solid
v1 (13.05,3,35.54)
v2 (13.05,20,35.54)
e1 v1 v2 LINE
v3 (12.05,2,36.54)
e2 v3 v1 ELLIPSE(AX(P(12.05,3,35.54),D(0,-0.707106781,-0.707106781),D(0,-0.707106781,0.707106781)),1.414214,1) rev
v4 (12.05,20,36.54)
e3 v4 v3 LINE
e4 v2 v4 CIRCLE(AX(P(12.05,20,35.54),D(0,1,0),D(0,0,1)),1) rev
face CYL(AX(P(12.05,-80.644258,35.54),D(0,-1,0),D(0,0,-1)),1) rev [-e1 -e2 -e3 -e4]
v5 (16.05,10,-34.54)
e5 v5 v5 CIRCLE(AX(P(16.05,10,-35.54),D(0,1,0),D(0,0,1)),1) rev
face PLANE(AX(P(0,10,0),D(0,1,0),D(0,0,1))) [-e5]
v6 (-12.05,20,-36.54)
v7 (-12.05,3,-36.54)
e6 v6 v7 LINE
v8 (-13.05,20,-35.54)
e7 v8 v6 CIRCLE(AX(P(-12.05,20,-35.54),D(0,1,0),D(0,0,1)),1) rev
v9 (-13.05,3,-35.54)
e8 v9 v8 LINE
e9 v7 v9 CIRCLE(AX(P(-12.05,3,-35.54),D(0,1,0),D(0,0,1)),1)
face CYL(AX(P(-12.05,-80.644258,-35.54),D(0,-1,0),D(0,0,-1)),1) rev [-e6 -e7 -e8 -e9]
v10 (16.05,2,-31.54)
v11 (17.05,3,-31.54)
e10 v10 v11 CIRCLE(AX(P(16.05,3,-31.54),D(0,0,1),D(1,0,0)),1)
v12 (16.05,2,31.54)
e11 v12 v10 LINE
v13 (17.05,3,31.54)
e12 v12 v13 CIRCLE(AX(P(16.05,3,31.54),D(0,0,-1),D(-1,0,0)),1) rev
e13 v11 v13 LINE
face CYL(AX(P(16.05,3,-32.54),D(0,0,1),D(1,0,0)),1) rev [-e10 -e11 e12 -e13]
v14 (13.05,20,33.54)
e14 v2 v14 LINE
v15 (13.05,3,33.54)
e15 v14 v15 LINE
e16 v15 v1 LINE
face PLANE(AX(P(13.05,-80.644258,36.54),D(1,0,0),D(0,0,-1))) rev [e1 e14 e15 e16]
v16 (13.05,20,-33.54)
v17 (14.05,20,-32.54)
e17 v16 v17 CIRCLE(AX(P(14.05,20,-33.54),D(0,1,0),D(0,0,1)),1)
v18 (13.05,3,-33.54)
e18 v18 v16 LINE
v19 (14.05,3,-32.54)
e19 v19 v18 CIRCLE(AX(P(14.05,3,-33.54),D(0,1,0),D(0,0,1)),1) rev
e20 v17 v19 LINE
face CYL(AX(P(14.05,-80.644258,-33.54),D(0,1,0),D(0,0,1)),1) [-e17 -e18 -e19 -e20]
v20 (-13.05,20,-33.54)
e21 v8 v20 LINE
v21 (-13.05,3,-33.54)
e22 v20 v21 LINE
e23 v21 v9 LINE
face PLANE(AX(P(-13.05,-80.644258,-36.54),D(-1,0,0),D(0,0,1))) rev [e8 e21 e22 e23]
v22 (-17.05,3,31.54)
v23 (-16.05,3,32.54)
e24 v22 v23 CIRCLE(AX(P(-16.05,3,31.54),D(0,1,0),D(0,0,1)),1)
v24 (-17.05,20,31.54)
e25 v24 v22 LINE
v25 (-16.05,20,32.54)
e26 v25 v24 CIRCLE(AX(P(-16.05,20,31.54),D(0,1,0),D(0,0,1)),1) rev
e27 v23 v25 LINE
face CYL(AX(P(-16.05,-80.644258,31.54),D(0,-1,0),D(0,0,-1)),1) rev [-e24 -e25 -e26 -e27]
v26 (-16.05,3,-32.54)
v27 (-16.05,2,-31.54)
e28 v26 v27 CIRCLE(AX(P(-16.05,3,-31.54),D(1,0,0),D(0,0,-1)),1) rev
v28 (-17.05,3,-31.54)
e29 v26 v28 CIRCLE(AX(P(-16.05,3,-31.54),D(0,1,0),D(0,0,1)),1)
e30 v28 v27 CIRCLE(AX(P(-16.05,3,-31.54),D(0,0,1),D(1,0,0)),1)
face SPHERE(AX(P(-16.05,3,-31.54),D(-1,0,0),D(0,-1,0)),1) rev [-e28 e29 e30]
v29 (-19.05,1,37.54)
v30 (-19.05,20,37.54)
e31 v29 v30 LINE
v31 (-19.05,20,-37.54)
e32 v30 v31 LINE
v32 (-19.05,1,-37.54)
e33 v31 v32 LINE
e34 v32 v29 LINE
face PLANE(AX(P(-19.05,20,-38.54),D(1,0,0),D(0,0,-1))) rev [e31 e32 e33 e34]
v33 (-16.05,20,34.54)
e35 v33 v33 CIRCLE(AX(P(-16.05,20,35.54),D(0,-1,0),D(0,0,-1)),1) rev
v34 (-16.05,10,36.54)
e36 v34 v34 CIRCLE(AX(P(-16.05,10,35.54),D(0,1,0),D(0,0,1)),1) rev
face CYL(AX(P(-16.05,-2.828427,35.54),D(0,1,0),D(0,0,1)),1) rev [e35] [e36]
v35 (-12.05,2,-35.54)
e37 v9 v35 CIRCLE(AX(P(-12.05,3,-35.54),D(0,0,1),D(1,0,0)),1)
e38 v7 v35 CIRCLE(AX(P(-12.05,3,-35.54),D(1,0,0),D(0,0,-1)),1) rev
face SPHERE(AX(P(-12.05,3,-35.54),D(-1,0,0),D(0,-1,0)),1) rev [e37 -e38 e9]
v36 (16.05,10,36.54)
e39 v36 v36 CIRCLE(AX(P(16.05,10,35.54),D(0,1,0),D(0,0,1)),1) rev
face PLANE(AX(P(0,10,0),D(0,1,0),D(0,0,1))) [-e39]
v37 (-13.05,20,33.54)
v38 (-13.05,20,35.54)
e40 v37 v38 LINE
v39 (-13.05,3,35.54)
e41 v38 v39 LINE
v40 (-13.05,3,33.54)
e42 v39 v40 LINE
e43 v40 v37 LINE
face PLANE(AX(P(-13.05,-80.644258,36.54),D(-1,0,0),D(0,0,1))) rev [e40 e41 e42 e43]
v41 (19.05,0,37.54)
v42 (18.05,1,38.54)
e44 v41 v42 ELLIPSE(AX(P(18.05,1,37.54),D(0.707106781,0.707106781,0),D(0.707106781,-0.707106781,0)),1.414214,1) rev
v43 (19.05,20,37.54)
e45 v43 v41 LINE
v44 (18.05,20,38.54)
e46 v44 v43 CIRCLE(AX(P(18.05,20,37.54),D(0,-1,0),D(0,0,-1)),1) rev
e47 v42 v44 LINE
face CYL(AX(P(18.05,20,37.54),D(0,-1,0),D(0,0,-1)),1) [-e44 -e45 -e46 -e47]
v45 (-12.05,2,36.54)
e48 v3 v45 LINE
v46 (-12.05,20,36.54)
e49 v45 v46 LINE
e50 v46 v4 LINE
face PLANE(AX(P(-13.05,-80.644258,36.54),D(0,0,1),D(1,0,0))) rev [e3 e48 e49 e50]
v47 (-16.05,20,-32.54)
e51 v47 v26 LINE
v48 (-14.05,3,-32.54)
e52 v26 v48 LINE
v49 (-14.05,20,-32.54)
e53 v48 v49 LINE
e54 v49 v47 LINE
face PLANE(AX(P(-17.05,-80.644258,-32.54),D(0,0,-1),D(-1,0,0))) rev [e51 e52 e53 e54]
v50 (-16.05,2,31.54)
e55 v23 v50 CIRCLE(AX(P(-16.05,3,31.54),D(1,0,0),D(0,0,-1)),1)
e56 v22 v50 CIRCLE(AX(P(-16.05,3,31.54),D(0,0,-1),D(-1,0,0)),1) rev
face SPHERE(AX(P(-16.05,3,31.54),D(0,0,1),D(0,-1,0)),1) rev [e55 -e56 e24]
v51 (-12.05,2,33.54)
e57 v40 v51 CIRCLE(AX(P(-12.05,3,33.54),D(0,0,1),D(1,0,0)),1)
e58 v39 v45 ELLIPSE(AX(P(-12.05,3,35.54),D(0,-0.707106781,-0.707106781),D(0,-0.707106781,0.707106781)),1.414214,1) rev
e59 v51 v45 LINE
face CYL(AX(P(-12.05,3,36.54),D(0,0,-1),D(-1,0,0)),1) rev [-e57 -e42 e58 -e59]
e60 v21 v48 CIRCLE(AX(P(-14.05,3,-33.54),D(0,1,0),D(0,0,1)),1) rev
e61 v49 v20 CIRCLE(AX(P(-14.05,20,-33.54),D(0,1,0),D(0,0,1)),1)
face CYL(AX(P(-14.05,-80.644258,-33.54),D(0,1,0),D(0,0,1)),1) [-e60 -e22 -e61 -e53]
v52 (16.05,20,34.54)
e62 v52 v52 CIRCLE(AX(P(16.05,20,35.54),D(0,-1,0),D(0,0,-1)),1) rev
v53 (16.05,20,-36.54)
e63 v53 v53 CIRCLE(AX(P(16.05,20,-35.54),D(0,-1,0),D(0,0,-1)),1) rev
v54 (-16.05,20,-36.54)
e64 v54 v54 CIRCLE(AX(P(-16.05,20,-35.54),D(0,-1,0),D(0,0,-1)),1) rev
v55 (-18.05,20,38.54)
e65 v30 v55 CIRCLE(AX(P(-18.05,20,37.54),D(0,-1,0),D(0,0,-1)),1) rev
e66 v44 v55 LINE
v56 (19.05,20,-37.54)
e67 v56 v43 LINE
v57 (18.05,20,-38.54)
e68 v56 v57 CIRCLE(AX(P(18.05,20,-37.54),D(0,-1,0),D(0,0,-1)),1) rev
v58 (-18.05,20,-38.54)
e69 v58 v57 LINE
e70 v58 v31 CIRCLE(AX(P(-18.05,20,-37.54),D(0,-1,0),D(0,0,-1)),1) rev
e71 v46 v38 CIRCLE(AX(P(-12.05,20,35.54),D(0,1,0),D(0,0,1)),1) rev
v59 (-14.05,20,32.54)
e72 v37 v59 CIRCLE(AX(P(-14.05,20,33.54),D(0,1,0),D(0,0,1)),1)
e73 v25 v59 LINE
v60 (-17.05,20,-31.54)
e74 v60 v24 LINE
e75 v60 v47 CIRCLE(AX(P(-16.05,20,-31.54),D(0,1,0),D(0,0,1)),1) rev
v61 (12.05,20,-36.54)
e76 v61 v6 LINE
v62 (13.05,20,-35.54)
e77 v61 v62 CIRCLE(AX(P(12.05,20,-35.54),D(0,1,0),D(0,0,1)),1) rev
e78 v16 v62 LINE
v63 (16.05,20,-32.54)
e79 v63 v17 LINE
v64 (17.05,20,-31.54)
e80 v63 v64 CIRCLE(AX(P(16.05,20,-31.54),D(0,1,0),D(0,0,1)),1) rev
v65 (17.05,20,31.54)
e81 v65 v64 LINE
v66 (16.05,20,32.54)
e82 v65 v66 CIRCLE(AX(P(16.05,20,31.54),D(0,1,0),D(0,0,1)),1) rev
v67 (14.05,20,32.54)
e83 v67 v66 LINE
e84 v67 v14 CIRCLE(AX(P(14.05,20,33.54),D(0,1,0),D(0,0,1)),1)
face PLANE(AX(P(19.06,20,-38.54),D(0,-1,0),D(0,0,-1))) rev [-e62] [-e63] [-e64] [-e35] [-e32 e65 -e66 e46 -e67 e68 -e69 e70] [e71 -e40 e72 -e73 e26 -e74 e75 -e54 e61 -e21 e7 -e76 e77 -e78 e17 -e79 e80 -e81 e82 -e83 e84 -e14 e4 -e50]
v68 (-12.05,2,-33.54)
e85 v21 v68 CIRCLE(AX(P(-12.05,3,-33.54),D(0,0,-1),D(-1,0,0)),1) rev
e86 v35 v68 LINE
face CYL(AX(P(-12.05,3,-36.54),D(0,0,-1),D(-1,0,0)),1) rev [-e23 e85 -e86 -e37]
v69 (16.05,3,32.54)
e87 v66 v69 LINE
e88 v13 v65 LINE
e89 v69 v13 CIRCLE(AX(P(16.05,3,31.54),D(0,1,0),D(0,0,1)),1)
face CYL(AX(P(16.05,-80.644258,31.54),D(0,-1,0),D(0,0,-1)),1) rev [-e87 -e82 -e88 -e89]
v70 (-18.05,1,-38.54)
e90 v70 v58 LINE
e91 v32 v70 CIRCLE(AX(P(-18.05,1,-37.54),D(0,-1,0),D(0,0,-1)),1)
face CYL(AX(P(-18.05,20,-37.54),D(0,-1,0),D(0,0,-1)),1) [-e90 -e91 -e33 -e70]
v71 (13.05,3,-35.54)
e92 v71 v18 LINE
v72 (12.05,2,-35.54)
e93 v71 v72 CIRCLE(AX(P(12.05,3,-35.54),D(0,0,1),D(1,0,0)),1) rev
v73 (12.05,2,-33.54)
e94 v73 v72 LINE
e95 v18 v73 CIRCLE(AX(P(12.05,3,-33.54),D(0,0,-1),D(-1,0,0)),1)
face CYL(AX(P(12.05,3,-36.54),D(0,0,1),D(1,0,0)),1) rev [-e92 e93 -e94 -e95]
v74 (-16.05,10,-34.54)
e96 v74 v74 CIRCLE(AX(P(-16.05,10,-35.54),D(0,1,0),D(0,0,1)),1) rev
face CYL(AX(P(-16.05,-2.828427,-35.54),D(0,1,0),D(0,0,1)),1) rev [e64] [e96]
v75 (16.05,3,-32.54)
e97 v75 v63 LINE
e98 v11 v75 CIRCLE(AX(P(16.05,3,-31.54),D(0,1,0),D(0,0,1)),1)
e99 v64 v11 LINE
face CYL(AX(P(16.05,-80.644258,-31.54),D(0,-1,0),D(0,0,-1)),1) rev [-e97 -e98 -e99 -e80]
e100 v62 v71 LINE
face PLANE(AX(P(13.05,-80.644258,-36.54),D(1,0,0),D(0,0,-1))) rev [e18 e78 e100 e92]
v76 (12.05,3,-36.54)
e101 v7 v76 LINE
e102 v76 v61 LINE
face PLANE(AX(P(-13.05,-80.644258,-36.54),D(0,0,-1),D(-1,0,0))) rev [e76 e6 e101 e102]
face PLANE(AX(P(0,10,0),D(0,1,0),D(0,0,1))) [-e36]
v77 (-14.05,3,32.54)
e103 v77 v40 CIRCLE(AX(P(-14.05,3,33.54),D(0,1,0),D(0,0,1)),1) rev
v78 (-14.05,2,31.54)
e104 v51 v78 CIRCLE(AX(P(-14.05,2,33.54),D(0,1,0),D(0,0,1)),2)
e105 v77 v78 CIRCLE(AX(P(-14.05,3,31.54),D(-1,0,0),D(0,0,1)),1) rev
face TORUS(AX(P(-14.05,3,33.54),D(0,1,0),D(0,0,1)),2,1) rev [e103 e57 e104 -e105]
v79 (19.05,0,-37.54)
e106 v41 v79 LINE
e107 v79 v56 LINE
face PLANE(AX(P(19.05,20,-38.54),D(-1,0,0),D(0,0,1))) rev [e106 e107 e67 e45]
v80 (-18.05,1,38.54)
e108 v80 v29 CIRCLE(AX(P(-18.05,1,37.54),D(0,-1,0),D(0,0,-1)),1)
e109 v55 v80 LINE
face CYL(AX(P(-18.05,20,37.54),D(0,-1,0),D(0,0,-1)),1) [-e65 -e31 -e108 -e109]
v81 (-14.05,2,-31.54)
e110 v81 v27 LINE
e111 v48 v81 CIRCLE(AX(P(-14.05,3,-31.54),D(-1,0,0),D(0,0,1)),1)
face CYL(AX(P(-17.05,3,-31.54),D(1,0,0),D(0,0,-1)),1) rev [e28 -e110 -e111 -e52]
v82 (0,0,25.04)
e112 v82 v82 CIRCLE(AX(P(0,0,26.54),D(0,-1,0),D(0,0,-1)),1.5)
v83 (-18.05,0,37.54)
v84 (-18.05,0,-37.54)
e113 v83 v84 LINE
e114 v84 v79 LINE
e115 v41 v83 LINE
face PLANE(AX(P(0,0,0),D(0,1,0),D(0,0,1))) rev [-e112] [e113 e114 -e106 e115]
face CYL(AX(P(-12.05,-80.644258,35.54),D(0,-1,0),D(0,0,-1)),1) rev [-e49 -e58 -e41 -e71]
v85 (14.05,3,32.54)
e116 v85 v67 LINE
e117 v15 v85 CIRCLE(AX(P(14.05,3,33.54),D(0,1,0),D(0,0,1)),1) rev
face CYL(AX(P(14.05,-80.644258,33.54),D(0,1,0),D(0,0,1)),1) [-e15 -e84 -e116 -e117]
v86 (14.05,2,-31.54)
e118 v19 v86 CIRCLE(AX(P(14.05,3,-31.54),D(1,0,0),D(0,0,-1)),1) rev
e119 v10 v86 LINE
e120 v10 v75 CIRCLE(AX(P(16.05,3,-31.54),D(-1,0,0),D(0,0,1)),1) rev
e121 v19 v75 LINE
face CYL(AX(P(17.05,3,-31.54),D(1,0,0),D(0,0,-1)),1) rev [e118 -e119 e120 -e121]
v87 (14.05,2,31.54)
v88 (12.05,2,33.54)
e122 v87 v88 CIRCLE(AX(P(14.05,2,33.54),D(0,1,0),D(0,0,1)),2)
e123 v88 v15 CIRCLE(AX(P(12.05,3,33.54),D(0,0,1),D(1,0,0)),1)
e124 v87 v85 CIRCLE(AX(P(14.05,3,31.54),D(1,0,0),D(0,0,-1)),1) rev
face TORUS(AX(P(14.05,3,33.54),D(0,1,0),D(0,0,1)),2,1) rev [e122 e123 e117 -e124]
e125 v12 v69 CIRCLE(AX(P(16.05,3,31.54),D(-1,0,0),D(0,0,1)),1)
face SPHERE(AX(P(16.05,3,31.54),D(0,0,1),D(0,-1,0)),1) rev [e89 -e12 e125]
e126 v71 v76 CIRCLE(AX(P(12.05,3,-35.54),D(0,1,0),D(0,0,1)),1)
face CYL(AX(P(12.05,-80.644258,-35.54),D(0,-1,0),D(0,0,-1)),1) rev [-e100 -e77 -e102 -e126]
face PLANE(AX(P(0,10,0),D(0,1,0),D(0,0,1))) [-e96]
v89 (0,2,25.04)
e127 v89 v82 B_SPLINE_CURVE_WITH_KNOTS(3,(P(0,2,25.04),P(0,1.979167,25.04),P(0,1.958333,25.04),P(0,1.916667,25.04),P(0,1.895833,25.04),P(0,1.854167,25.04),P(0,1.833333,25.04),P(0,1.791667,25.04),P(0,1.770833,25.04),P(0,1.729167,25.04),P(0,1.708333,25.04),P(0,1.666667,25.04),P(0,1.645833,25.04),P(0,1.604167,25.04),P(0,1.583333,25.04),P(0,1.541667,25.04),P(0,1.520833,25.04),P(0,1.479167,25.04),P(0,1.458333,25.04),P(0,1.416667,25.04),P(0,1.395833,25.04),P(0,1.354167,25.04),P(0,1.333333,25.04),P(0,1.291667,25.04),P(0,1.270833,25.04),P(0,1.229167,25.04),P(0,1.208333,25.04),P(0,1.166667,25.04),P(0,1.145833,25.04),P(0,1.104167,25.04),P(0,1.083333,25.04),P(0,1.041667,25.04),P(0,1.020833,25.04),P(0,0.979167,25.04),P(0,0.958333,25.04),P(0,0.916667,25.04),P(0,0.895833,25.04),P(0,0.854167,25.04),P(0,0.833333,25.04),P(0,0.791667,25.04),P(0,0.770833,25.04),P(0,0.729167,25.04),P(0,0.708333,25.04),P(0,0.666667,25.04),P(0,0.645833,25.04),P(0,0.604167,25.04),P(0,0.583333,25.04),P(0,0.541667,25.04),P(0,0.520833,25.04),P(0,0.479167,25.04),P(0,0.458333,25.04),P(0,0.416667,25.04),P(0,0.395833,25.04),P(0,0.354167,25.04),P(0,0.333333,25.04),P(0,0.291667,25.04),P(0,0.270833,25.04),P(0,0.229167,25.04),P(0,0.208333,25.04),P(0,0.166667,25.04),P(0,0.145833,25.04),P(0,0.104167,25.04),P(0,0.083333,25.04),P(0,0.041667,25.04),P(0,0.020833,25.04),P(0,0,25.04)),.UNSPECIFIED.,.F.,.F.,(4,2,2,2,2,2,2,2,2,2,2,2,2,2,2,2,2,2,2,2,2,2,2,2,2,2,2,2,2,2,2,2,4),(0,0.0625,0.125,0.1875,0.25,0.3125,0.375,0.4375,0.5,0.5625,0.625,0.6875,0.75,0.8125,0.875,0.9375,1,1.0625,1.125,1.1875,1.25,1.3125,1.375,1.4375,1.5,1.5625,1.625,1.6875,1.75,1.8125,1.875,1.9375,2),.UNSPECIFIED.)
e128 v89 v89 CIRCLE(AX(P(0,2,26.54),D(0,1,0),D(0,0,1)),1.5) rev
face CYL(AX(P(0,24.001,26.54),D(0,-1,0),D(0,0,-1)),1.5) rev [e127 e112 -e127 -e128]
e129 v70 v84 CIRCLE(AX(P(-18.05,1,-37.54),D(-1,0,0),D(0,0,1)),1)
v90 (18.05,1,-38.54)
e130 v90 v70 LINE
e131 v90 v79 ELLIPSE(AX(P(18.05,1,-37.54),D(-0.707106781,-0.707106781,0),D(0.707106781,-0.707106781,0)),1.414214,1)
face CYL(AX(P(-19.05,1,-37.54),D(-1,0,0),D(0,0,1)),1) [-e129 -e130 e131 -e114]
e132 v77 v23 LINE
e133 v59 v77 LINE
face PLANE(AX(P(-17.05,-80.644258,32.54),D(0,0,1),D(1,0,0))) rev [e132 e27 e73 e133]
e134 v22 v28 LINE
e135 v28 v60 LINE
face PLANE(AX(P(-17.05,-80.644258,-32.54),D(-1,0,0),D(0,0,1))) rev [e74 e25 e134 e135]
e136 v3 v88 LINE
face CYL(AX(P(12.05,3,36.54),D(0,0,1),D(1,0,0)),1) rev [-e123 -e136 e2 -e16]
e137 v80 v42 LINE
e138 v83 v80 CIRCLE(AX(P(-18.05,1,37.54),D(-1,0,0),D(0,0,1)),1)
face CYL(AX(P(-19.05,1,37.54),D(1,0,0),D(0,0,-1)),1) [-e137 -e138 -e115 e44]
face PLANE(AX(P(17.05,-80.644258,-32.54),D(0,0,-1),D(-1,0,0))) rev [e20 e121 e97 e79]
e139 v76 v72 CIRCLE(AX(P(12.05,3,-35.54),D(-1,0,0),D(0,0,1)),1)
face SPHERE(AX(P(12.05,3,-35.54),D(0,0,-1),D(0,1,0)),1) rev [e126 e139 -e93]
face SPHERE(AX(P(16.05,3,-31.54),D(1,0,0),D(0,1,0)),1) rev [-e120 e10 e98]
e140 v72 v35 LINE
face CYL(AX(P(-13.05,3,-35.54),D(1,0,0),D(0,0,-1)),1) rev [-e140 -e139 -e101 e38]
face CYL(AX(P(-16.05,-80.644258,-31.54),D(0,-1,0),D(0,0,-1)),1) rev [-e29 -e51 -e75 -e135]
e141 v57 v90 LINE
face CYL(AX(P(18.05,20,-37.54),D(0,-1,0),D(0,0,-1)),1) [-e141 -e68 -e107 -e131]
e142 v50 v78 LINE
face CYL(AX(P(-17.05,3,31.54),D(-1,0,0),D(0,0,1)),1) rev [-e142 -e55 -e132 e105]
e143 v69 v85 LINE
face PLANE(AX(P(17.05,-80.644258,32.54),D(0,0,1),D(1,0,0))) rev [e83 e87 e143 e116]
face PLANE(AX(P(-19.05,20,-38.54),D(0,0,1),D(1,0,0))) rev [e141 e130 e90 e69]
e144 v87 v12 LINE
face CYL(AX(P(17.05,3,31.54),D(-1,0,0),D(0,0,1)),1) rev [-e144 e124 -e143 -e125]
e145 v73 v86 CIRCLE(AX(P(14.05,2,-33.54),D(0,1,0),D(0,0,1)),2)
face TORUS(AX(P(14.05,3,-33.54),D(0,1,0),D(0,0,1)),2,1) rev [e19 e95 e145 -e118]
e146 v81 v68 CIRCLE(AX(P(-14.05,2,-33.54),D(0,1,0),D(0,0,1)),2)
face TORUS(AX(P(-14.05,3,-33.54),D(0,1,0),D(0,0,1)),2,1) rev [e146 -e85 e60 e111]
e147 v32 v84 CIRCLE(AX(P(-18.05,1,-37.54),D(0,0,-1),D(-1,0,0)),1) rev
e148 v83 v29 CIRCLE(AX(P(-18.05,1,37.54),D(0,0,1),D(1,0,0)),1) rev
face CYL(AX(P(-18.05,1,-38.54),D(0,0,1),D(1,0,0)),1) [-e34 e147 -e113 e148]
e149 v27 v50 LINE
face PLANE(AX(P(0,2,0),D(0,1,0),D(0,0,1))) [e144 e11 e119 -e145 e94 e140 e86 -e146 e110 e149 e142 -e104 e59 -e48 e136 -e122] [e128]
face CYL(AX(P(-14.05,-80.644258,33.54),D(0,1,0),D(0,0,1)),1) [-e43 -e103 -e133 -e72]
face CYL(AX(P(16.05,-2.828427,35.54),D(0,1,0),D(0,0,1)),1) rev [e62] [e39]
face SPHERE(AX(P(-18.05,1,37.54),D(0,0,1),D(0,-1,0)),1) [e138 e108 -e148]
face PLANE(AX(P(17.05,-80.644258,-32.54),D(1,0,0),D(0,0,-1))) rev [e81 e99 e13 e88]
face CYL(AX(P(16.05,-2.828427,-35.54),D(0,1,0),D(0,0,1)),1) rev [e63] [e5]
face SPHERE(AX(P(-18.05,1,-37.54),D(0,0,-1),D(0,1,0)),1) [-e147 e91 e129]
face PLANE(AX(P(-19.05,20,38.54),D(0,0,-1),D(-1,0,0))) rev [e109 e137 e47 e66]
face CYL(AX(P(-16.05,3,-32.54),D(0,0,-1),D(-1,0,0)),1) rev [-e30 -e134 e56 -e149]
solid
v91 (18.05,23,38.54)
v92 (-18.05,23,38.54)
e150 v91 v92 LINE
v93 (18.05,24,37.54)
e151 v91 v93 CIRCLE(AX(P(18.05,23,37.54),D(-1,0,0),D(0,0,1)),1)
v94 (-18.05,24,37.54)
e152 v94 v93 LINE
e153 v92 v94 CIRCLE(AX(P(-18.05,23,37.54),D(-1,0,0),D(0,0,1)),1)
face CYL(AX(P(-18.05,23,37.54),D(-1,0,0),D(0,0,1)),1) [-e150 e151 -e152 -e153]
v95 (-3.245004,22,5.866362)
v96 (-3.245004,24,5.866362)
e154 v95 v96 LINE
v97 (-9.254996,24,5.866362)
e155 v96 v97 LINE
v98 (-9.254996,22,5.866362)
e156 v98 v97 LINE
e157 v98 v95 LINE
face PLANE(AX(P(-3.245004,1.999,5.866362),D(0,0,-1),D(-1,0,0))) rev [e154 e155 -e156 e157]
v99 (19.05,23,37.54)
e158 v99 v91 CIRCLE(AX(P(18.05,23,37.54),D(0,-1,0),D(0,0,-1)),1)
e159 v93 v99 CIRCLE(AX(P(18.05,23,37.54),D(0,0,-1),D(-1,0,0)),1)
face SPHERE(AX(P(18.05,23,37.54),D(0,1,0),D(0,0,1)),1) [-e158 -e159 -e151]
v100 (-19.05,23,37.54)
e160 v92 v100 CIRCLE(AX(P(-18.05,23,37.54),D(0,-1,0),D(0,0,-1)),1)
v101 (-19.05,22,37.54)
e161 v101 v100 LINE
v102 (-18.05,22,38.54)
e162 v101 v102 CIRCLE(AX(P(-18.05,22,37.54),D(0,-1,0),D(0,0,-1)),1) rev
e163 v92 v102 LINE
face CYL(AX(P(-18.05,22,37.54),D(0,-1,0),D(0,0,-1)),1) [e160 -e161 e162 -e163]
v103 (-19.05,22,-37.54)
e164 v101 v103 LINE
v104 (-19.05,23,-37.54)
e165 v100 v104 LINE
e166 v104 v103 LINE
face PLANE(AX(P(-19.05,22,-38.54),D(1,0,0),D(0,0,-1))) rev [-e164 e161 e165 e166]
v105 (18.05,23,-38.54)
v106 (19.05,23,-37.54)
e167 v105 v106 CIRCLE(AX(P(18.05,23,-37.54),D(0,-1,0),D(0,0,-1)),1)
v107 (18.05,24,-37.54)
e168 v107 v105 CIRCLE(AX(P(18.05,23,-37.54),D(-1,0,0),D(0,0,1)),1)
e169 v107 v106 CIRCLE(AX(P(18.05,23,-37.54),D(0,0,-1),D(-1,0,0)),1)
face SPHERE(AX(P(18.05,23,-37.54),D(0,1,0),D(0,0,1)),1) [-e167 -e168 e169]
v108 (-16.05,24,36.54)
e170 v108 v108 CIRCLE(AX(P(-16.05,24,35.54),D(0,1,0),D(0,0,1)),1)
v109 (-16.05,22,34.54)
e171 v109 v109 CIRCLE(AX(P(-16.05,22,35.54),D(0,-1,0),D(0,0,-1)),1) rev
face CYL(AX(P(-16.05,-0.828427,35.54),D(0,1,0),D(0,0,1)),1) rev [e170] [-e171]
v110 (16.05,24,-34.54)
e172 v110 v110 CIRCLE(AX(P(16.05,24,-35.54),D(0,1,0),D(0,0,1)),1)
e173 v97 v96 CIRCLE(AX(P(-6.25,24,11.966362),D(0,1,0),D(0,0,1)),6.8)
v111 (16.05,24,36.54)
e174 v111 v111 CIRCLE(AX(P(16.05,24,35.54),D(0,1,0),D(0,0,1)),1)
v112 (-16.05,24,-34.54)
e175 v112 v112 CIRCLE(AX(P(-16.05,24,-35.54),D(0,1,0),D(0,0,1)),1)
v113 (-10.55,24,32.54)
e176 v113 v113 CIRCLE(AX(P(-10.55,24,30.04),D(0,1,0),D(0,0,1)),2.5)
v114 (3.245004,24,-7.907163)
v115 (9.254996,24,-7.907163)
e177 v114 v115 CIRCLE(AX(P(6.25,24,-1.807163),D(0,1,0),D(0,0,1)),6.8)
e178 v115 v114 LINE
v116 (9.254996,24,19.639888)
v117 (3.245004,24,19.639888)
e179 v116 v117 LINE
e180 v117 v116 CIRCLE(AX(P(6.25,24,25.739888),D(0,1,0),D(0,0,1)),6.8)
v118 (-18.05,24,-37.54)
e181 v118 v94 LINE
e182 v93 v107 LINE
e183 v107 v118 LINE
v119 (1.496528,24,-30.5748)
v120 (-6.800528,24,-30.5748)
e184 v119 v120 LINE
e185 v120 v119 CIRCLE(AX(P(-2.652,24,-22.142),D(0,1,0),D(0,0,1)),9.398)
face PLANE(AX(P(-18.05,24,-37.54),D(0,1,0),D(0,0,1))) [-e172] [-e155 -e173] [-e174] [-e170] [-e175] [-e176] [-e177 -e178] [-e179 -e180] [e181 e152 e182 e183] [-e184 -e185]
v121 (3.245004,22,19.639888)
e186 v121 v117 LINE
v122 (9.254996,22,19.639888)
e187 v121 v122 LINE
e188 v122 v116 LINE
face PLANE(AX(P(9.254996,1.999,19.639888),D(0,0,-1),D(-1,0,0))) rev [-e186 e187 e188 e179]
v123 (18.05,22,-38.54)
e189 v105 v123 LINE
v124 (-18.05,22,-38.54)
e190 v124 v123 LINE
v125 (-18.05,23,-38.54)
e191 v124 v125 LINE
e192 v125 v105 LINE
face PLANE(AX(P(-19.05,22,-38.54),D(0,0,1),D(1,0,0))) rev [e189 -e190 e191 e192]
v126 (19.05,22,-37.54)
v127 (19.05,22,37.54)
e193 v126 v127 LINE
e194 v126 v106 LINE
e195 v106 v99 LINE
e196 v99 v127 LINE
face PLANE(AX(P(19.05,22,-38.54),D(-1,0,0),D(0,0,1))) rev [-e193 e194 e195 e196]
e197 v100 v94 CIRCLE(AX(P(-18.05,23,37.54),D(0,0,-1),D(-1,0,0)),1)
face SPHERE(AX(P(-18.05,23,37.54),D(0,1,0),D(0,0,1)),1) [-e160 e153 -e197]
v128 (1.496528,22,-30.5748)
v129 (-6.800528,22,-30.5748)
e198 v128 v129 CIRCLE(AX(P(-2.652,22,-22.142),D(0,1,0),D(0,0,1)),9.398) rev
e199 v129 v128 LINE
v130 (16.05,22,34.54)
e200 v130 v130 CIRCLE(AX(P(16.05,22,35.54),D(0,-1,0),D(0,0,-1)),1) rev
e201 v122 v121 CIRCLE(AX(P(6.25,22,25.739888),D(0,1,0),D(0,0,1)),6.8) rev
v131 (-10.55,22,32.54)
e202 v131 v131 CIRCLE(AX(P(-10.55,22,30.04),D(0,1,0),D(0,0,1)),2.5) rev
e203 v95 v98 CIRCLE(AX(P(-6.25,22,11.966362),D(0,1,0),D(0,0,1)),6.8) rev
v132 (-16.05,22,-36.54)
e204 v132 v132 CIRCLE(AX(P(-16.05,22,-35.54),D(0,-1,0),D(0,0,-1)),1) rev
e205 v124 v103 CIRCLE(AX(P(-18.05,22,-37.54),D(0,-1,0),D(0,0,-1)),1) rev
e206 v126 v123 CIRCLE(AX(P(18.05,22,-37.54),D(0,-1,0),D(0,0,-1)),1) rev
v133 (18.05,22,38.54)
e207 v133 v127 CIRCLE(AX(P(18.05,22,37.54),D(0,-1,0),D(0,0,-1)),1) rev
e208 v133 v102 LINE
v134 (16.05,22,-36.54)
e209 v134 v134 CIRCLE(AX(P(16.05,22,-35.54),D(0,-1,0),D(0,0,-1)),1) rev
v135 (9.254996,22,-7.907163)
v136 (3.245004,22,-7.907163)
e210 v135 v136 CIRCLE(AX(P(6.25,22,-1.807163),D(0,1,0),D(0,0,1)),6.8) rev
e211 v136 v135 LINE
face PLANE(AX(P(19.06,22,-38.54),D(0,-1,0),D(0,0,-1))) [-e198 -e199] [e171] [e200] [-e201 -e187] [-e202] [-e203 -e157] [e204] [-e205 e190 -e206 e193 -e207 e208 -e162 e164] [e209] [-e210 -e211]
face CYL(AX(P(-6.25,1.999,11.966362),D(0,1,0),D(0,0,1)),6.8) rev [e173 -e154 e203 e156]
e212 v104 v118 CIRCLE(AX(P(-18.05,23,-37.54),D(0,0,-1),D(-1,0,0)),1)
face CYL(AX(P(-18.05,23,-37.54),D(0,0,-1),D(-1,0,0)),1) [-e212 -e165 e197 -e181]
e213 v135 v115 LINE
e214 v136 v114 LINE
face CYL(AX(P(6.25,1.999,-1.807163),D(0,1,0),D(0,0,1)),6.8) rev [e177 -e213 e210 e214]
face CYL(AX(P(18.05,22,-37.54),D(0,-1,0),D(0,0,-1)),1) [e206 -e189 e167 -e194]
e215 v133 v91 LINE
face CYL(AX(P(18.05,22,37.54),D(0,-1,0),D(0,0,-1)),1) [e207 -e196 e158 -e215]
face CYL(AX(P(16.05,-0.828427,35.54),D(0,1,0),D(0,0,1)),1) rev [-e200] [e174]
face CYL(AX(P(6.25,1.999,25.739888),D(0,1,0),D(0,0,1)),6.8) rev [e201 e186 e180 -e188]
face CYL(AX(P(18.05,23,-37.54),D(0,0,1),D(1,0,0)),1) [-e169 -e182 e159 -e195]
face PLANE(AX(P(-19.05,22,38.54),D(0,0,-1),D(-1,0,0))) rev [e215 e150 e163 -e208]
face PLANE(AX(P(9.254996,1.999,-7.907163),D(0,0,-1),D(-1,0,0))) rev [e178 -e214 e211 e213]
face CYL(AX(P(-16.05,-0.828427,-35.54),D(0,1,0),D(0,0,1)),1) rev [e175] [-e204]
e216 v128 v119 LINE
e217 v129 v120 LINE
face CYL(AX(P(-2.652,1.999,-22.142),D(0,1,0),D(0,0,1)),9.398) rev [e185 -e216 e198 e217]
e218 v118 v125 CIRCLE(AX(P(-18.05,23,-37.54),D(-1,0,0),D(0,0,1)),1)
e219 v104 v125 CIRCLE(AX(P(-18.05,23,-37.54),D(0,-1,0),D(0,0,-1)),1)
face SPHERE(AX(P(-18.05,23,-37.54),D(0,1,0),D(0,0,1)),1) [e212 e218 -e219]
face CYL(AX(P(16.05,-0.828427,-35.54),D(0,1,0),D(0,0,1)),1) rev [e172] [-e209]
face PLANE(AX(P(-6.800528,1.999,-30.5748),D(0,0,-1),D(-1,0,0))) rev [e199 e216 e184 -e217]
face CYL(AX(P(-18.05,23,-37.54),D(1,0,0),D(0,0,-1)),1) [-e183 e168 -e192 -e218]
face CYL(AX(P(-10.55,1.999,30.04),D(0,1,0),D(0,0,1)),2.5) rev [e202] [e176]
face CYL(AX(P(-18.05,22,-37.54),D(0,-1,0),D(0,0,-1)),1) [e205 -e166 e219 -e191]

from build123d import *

# Parameters (mm, degrees)
CASE_OUTLINE_SKETCH_W    = 38.1
CASE_OUTLINE_SKETCH_H    = 77.08
BOSS_EXTRUDE1_DEPTH      = 20
CUT_EXTRUDE1_DEPTH       = 18
FILLET2_R                = 1
LID_SCREW_HOLES_SKETCH_R = 1
CUT_EXTRUDE2_DEPTH       = 10
BOSS_EXTRUDE4_START      = 2
LID_SKETCH_R             = 1
BOSS_EXTRUDE4_DEPTH      = 2
CUT_EXTRUDE3_REACH       = 50.293
LID_CUTTOUTS_SKETCH_R    = 2.5
SPLIT1_START             = 20
SPLIT1_OUTLINE_R         = 1
SPLIT1_OUTLINE_R_2       = 2.5
SPLIT1_DEPTH             = 2
SPLIT1_2_OUTLINE_R       = 1
SPLIT1_2_OUTLINE_R_2     = 2.5
SPLIT1_2_DEPTH           = 2
FILLET3_R                = 1
POWER_WIRES_ENTRY_R      = 1.5
CUT_EXTRUDE4_DEPTH       = 2


with BuildPart() as part:
    # Case Outline Sketch → Boss-Extrude1 (new body)
    with BuildSketch(Plane(origin=(0, 0, 0), x_dir=(1, 0, 0), z_dir=(0, 1, 0))):
        Rectangle(CASE_OUTLINE_SKETCH_W, CASE_OUTLINE_SKETCH_H)
    extrude(amount=BOSS_EXTRUDE1_DEPTH)

    # Sketch2 → Cut-Extrude1 (cut)
    with BuildSketch(Plane(origin=(0, 20, 0), x_dir=(1, 0, 0), z_dir=(0, 1, 0))):
        Polygon((-13.05, 36.54), (13.05, 36.54), (13.05, 32.54), (17.05, 32.54), (17.05, -32.54), (13.05, -32.54), (13.05, -36.54), (-13.05, -36.54), (-13.05, -32.54), (-17.05, -32.54), (-17.05, 32.54), (-13.05, 32.54), align=None)
    extrude(amount=-CUT_EXTRUDE1_DEPTH, mode=Mode.SUBTRACT)

    # Fillet2
    fillet2_edges = [part.edges().sort_by_distance(p)[0] for p in [
        (13.05, 11, -36.54),
        (13.05, 11, -32.54),
        (17.05, 11, -32.54),
        (17.05, 11, 32.54),
        (13.05, 11, 32.54),
        (13.05, 11, 36.54),
        (-13.05, 11, 36.54),
        (-13.05, 11, 32.54),
        (-17.05, 11, 32.54),
        (-17.05, 11, -32.54),
        (-13.05, 11, -32.54),
        (-13.05, 11, -36.54),
        (13.05, 2, -34.54),
        (15.05, 2, -32.54),
        (17.05, 2, 0),
        (15.05, 2, 32.54),
        (13.05, 2, 34.54),
        (-13.05, 2, 34.54),
        (-15.05, 2, 32.54),
        (-17.05, 2, 0),
        (-15.05, 2, -32.54),
        (-13.05, 2, -34.54),
        (0, 2, -36.54),
        (0, 0, 38.54),
        (-19.05, 0, 0),
        (0, 0, -38.54),
        (19.05, 10, 38.54),
        (-19.05, 10, 38.54),
        (-19.05, 10, -38.54),
        (19.05, 10, -38.54),
    ]]
    fillet(fillet2_edges, radius=FILLET2_R)

    # Lid Screw Holes Sketch → Cut-Extrude2 (cut)
    with BuildSketch(Plane(origin=(0, 20, 0), x_dir=(1, 0, 0), z_dir=(0, 1, 0))):
        with Locations(Location((-16.05, 35.54, 0), (0, 0, 270))):
            Circle(LID_SCREW_HOLES_SKETCH_R)
        with Locations(Location((16.05, 35.54, 0), (0, 0, 270))):
            Circle(LID_SCREW_HOLES_SKETCH_R)
        with Locations(Location((16.05, -35.54, 0), (0, 0, 270))):
            Circle(LID_SCREW_HOLES_SKETCH_R)
        with Locations(Location((-16.05, -35.54, 0), (0, 0, 270))):
            Circle(LID_SCREW_HOLES_SKETCH_R)
    extrude(amount=-CUT_EXTRUDE2_DEPTH, mode=Mode.SUBTRACT)

    # Lid Sketch → Boss-Extrude4 (add)
    with BuildSketch(Plane(origin=(0, 20, 0), x_dir=(1, 0, 0), z_dir=(0, 1, 0)).offset(BOSS_EXTRUDE4_START)):
        with BuildLine():
            Line((-19.05, 37.54), (-19.05, -37.54))
            ThreePointArc((-19.05, -37.54), (-18.757106781, -38.247106781), (-18.05, -38.54))
            Line((-18.05, -38.54), (18.05, -38.54))
            ThreePointArc((18.05, -38.54), (18.757106781, -38.247106781), (19.05, -37.54))
            Line((19.05, -37.54), (19.05, 37.54))
            ThreePointArc((19.05, 37.54), (18.757106781, 38.247106781), (18.05, 38.54))
            Line((18.05, 38.54), (-18.05, 38.54))
            ThreePointArc((-18.05, 38.54), (-18.757106781, 38.247106781), (-19.05, 37.54))
        make_face()
        with Locations(Location((-16.05, 35.54, 0), (0, 0, 270))):
            Circle(LID_SKETCH_R, mode=Mode.SUBTRACT)
        with Locations(Location((-16.05, -35.54, 0), (0, 0, 270))):
            Circle(LID_SKETCH_R, mode=Mode.SUBTRACT)
        with Locations(Location((16.05, -35.54, 0), (0, 0, 270))):
            Circle(LID_SKETCH_R, mode=Mode.SUBTRACT)
        with Locations(Location((16.05, 35.54, 0), (0, 0, 270))):
            Circle(LID_SKETCH_R, mode=Mode.SUBTRACT)
    extrude(amount=-BOSS_EXTRUDE4_DEPTH)

    # Lid Cuttouts Sketch → Cut-Extrude3 (cut, up to next)
    with BuildSketch(Plane(origin=(0, 22, 0), x_dir=(1, 0, 0), z_dir=(0, 1, 0)), mode=Mode.PRIVATE) as cut_extrude3_sk1:
        with Locations(Location((-10.55, -30.04, 0), (0, 0, 270))):
            Circle(LID_CUTTOUTS_SKETCH_R)
    cut_extrude3_tool1 = extrude(cut_extrude3_sk1.sketch, amount=-CUT_EXTRUDE3_REACH, mode=Mode.PRIVATE) & part.part
    # Lid Cuttouts Sketch → Cut-Extrude3 (cut, up to next)
    with BuildSketch(Plane(origin=(0, 22, 0), x_dir=(1, 0, 0), z_dir=(0, 1, 0)), mode=Mode.PRIVATE) as cut_extrude3_sk2:
        with BuildLine():
            Line((-6.800528433, 30.5748), (1.496528433, 30.5748))
            ThreePointArc((1.496528433, 30.5748), (-2.652, 12.744), (-6.800528433, 30.5748))
        make_face()
    cut_extrude3_tool2 = extrude(cut_extrude3_sk2.sketch, amount=-CUT_EXTRUDE3_REACH, mode=Mode.PRIVATE) & part.part
    # Lid Cuttouts Sketch → Cut-Extrude3 (cut, up to next)
    with BuildSketch(Plane(origin=(0, 22, 0), x_dir=(1, 0, 0), z_dir=(0, 1, 0)), mode=Mode.PRIVATE) as cut_extrude3_sk3:
        with BuildLine():
            Line((9.25499584, 7.907162897), (3.24500416, 7.907162897))
            ThreePointArc((3.24500416, 7.907162897), (6.25, -4.992837103), (9.25499584, 7.907162897))
        make_face()
    cut_extrude3_tool3 = extrude(cut_extrude3_sk3.sketch, amount=-CUT_EXTRUDE3_REACH, mode=Mode.PRIVATE) & part.part
    # Lid Cuttouts Sketch → Cut-Extrude3 (cut, up to next)
    with BuildSketch(Plane(origin=(0, 22, 0), x_dir=(1, 0, 0), z_dir=(0, 1, 0)), mode=Mode.PRIVATE) as cut_extrude3_sk4:
        with BuildLine():
            Line((-3.24500416, -5.866362432), (-9.25499584, -5.866362432))
            ThreePointArc((-9.25499584, -5.866362432), (-6.25, -18.766362432), (-3.24500416, -5.866362432))
        make_face()
    cut_extrude3_tool4 = extrude(cut_extrude3_sk4.sketch, amount=-CUT_EXTRUDE3_REACH, mode=Mode.PRIVATE) & part.part
    # Lid Cuttouts Sketch → Cut-Extrude3 (cut, up to next)
    with BuildSketch(Plane(origin=(0, 22, 0), x_dir=(1, 0, 0), z_dir=(0, 1, 0)), mode=Mode.PRIVATE) as cut_extrude3_sk5:
        with BuildLine():
            Line((9.25499584, -19.639887762), (3.24500416, -19.639887762))
            ThreePointArc((3.24500416, -19.639887762), (6.25, -32.539887762), (9.25499584, -19.639887762))
        make_face()
    cut_extrude3_tool5 = extrude(cut_extrude3_sk5.sketch, amount=-CUT_EXTRUDE3_REACH, mode=Mode.PRIVATE) & part.part
    add(cut_extrude3_tool1.solids().sort_by_distance((-10.55, 22, 30.04))[0], mode=Mode.SUBTRACT)
    add(cut_extrude3_tool2.solids().sort_by_distance((-2.652, 22, -21.967056))[0], mode=Mode.SUBTRACT)
    add(cut_extrude3_tool3.solids().sort_by_distance((6.25, 22, -1.680155))[0], mode=Mode.SUBTRACT)
    add(cut_extrude3_tool4.solids().sort_by_distance((-6.25, 22, 12.093371))[0], mode=Mode.SUBTRACT)
    add(cut_extrude3_tool5.solids().sort_by_distance((6.25, 22, 25.866896))[0], mode=Mode.SUBTRACT)

    # Split1 2 outline → Split1 2 (cut)
    with BuildSketch(Plane(origin=(0, 0, 0), x_dir=(1, 0, 0), z_dir=(0, 1, 0)).offset(SPLIT1_START)):
        with BuildLine():
            ThreePointArc((-18.05, 38.54), (-18.757106781, 38.247106781), (-19.05, 37.54))
            Line((-19.05, 37.54), (-19.05, -37.54))
            ThreePointArc((-19.05, -37.54), (-18.757106781, -38.247106781), (-18.05, -38.54))
            Line((-18.05, -38.54), (18.05, -38.54))
            ThreePointArc((18.05, -38.54), (18.757106781, -38.247106781), (19.05, -37.54))
            Line((19.05, -37.54), (19.05, 37.54))
            ThreePointArc((19.05, 37.54), (18.757106781, 38.247106781), (18.05, 38.54))
            Line((18.05, 38.54), (-18.05, 38.54))
        make_face()
        with Locations((-16.05, -35.54)):
            Circle(SPLIT1_2_OUTLINE_R, mode=Mode.SUBTRACT)
        with Locations((-10.55, -30.04)):
            Circle(SPLIT1_2_OUTLINE_R_2, mode=Mode.SUBTRACT)
        with BuildLine():
            ThreePointArc((-3.24500416, -5.866362432), (-6.25, -18.766362432), (-9.25499584, -5.866362432))
            Line((-9.25499584, -5.866362432), (-3.24500416, -5.866362432))
        make_face(mode=Mode.SUBTRACT)
        with BuildLine():
            ThreePointArc((9.25499584, -19.639887762), (6.25, -32.539887762), (3.24500416, -19.639887762))
            Line((3.24500416, -19.639887762), (9.25499584, -19.639887762))
        make_face(mode=Mode.SUBTRACT)
        with Locations((16.05, -35.54)):
            Circle(SPLIT1_2_OUTLINE_R, mode=Mode.SUBTRACT)
        with Locations((-16.05, 35.54)):
            Circle(SPLIT1_2_OUTLINE_R, mode=Mode.SUBTRACT)
        with BuildLine():
            ThreePointArc((1.496528433, 30.5748), (-2.652, 12.744), (-6.800528433, 30.5748))
            Line((-6.800528433, 30.5748), (1.496528433, 30.5748))
        make_face(mode=Mode.SUBTRACT)
        with BuildLine():
            ThreePointArc((9.25499584, 7.907162897), (6.25, -4.992837103), (3.24500416, 7.907162897))
            Line((3.24500416, 7.907162897), (9.25499584, 7.907162897))
        make_face(mode=Mode.SUBTRACT)
        with Locations((16.05, 35.54)):
            Circle(SPLIT1_2_OUTLINE_R, mode=Mode.SUBTRACT)
    extrude(amount=SPLIT1_2_DEPTH, mode=Mode.SUBTRACT)

    # Power Wires Entry → Cut-Extrude4 (cut)
    with BuildSketch(Plane.XZ):
        with Locations(Location((0, 26.54, 0), (0, 0, 270))):
            Circle(POWER_WIRES_ENTRY_R)
    extrude(amount=-CUT_EXTRUDE4_DEPTH, mode=Mode.SUBTRACT)


with BuildPart() as body_2:
    # Split1: read off the stored shape, not the designer's step
    # Split1 outline → Split1 (new body)
    with BuildSketch(Plane(origin=(0, 0, 0), x_dir=(1, 0, 0), z_dir=(0, 1, 0)).offset(SPLIT1_START)):
        with BuildLine():
            Line((18.05, 38.54), (-18.05, 38.54))
            ThreePointArc((-18.05, 38.54), (-18.757106781, 38.247106781), (-19.05, 37.54))
            Line((-19.05, 37.54), (-19.05, -37.54))
            ThreePointArc((-19.05, -37.54), (-18.757106781, -38.247106781), (-18.05, -38.54))
            Line((-18.05, -38.54), (18.05, -38.54))
            ThreePointArc((18.05, -38.54), (18.757106781, -38.247106781), (19.05, -37.54))
            Line((19.05, -37.54), (19.05, 37.54))
            ThreePointArc((19.05, 37.54), (18.757106781, 38.247106781), (18.05, 38.54))
        make_face()
        with Locations((-16.05, -35.54)):
            Circle(SPLIT1_OUTLINE_R, mode=Mode.SUBTRACT)
        with Locations((-10.55, -30.04)):
            Circle(SPLIT1_OUTLINE_R_2, mode=Mode.SUBTRACT)
        with BuildLine():
            Line((-9.25499584, -5.866362432), (-3.24500416, -5.866362432))
            ThreePointArc((-3.24500416, -5.866362432), (-6.25, -18.766362432), (-9.25499584, -5.866362432))
        make_face(mode=Mode.SUBTRACT)
        with BuildLine():
            Line((3.24500416, -19.639887762), (9.25499584, -19.639887762))
            ThreePointArc((9.25499584, -19.639887762), (6.25, -32.539887762), (3.24500416, -19.639887762))
        make_face(mode=Mode.SUBTRACT)
        with Locations((16.05, -35.54)):
            Circle(SPLIT1_OUTLINE_R, mode=Mode.SUBTRACT)
        with Locations((-16.05, 35.54)):
            Circle(SPLIT1_OUTLINE_R, mode=Mode.SUBTRACT)
        with BuildLine():
            Line((-6.800528433, 30.5748), (1.496528433, 30.5748))
            ThreePointArc((1.496528433, 30.5748), (-2.652, 12.744), (-6.800528433, 30.5748))
        make_face(mode=Mode.SUBTRACT)
        with BuildLine():
            Line((3.24500416, 7.907162897), (9.25499584, 7.907162897))
            ThreePointArc((9.25499584, 7.907162897), (6.25, -4.992837103), (3.24500416, 7.907162897))
        make_face(mode=Mode.SUBTRACT)
        with Locations((16.05, 35.54)):
            Circle(SPLIT1_OUTLINE_R, mode=Mode.SUBTRACT)
    extrude(amount=SPLIT1_DEPTH)

    # Fillet3
    fillet3_edges = [body_2.edges().sort_by_distance(p)[0] for p in [
        (-18.757106781, 22, -38.247106781),
        (-19.05, 22, 0),
        (-18.757106781, 22, 38.247106781),
        (0, 22, 38.54),
        (18.757106781, 22, 38.247106781),
        (19.05, 22, 0),
        (18.757106781, 22, -38.247106781),
        (0, 22, -38.54),
    ]]
    fillet(fillet3_edges, radius=FILLET3_R)


with BuildPart() as body_2_1:
    # Body-Move/Copy2: read off the stored shape, not the designer's step
    # Body-Move/Copy2: moved
    add(body_2.part.moved(Location((0, 2, 0))))


solid = Compound([part.part, body_2_1.part])
